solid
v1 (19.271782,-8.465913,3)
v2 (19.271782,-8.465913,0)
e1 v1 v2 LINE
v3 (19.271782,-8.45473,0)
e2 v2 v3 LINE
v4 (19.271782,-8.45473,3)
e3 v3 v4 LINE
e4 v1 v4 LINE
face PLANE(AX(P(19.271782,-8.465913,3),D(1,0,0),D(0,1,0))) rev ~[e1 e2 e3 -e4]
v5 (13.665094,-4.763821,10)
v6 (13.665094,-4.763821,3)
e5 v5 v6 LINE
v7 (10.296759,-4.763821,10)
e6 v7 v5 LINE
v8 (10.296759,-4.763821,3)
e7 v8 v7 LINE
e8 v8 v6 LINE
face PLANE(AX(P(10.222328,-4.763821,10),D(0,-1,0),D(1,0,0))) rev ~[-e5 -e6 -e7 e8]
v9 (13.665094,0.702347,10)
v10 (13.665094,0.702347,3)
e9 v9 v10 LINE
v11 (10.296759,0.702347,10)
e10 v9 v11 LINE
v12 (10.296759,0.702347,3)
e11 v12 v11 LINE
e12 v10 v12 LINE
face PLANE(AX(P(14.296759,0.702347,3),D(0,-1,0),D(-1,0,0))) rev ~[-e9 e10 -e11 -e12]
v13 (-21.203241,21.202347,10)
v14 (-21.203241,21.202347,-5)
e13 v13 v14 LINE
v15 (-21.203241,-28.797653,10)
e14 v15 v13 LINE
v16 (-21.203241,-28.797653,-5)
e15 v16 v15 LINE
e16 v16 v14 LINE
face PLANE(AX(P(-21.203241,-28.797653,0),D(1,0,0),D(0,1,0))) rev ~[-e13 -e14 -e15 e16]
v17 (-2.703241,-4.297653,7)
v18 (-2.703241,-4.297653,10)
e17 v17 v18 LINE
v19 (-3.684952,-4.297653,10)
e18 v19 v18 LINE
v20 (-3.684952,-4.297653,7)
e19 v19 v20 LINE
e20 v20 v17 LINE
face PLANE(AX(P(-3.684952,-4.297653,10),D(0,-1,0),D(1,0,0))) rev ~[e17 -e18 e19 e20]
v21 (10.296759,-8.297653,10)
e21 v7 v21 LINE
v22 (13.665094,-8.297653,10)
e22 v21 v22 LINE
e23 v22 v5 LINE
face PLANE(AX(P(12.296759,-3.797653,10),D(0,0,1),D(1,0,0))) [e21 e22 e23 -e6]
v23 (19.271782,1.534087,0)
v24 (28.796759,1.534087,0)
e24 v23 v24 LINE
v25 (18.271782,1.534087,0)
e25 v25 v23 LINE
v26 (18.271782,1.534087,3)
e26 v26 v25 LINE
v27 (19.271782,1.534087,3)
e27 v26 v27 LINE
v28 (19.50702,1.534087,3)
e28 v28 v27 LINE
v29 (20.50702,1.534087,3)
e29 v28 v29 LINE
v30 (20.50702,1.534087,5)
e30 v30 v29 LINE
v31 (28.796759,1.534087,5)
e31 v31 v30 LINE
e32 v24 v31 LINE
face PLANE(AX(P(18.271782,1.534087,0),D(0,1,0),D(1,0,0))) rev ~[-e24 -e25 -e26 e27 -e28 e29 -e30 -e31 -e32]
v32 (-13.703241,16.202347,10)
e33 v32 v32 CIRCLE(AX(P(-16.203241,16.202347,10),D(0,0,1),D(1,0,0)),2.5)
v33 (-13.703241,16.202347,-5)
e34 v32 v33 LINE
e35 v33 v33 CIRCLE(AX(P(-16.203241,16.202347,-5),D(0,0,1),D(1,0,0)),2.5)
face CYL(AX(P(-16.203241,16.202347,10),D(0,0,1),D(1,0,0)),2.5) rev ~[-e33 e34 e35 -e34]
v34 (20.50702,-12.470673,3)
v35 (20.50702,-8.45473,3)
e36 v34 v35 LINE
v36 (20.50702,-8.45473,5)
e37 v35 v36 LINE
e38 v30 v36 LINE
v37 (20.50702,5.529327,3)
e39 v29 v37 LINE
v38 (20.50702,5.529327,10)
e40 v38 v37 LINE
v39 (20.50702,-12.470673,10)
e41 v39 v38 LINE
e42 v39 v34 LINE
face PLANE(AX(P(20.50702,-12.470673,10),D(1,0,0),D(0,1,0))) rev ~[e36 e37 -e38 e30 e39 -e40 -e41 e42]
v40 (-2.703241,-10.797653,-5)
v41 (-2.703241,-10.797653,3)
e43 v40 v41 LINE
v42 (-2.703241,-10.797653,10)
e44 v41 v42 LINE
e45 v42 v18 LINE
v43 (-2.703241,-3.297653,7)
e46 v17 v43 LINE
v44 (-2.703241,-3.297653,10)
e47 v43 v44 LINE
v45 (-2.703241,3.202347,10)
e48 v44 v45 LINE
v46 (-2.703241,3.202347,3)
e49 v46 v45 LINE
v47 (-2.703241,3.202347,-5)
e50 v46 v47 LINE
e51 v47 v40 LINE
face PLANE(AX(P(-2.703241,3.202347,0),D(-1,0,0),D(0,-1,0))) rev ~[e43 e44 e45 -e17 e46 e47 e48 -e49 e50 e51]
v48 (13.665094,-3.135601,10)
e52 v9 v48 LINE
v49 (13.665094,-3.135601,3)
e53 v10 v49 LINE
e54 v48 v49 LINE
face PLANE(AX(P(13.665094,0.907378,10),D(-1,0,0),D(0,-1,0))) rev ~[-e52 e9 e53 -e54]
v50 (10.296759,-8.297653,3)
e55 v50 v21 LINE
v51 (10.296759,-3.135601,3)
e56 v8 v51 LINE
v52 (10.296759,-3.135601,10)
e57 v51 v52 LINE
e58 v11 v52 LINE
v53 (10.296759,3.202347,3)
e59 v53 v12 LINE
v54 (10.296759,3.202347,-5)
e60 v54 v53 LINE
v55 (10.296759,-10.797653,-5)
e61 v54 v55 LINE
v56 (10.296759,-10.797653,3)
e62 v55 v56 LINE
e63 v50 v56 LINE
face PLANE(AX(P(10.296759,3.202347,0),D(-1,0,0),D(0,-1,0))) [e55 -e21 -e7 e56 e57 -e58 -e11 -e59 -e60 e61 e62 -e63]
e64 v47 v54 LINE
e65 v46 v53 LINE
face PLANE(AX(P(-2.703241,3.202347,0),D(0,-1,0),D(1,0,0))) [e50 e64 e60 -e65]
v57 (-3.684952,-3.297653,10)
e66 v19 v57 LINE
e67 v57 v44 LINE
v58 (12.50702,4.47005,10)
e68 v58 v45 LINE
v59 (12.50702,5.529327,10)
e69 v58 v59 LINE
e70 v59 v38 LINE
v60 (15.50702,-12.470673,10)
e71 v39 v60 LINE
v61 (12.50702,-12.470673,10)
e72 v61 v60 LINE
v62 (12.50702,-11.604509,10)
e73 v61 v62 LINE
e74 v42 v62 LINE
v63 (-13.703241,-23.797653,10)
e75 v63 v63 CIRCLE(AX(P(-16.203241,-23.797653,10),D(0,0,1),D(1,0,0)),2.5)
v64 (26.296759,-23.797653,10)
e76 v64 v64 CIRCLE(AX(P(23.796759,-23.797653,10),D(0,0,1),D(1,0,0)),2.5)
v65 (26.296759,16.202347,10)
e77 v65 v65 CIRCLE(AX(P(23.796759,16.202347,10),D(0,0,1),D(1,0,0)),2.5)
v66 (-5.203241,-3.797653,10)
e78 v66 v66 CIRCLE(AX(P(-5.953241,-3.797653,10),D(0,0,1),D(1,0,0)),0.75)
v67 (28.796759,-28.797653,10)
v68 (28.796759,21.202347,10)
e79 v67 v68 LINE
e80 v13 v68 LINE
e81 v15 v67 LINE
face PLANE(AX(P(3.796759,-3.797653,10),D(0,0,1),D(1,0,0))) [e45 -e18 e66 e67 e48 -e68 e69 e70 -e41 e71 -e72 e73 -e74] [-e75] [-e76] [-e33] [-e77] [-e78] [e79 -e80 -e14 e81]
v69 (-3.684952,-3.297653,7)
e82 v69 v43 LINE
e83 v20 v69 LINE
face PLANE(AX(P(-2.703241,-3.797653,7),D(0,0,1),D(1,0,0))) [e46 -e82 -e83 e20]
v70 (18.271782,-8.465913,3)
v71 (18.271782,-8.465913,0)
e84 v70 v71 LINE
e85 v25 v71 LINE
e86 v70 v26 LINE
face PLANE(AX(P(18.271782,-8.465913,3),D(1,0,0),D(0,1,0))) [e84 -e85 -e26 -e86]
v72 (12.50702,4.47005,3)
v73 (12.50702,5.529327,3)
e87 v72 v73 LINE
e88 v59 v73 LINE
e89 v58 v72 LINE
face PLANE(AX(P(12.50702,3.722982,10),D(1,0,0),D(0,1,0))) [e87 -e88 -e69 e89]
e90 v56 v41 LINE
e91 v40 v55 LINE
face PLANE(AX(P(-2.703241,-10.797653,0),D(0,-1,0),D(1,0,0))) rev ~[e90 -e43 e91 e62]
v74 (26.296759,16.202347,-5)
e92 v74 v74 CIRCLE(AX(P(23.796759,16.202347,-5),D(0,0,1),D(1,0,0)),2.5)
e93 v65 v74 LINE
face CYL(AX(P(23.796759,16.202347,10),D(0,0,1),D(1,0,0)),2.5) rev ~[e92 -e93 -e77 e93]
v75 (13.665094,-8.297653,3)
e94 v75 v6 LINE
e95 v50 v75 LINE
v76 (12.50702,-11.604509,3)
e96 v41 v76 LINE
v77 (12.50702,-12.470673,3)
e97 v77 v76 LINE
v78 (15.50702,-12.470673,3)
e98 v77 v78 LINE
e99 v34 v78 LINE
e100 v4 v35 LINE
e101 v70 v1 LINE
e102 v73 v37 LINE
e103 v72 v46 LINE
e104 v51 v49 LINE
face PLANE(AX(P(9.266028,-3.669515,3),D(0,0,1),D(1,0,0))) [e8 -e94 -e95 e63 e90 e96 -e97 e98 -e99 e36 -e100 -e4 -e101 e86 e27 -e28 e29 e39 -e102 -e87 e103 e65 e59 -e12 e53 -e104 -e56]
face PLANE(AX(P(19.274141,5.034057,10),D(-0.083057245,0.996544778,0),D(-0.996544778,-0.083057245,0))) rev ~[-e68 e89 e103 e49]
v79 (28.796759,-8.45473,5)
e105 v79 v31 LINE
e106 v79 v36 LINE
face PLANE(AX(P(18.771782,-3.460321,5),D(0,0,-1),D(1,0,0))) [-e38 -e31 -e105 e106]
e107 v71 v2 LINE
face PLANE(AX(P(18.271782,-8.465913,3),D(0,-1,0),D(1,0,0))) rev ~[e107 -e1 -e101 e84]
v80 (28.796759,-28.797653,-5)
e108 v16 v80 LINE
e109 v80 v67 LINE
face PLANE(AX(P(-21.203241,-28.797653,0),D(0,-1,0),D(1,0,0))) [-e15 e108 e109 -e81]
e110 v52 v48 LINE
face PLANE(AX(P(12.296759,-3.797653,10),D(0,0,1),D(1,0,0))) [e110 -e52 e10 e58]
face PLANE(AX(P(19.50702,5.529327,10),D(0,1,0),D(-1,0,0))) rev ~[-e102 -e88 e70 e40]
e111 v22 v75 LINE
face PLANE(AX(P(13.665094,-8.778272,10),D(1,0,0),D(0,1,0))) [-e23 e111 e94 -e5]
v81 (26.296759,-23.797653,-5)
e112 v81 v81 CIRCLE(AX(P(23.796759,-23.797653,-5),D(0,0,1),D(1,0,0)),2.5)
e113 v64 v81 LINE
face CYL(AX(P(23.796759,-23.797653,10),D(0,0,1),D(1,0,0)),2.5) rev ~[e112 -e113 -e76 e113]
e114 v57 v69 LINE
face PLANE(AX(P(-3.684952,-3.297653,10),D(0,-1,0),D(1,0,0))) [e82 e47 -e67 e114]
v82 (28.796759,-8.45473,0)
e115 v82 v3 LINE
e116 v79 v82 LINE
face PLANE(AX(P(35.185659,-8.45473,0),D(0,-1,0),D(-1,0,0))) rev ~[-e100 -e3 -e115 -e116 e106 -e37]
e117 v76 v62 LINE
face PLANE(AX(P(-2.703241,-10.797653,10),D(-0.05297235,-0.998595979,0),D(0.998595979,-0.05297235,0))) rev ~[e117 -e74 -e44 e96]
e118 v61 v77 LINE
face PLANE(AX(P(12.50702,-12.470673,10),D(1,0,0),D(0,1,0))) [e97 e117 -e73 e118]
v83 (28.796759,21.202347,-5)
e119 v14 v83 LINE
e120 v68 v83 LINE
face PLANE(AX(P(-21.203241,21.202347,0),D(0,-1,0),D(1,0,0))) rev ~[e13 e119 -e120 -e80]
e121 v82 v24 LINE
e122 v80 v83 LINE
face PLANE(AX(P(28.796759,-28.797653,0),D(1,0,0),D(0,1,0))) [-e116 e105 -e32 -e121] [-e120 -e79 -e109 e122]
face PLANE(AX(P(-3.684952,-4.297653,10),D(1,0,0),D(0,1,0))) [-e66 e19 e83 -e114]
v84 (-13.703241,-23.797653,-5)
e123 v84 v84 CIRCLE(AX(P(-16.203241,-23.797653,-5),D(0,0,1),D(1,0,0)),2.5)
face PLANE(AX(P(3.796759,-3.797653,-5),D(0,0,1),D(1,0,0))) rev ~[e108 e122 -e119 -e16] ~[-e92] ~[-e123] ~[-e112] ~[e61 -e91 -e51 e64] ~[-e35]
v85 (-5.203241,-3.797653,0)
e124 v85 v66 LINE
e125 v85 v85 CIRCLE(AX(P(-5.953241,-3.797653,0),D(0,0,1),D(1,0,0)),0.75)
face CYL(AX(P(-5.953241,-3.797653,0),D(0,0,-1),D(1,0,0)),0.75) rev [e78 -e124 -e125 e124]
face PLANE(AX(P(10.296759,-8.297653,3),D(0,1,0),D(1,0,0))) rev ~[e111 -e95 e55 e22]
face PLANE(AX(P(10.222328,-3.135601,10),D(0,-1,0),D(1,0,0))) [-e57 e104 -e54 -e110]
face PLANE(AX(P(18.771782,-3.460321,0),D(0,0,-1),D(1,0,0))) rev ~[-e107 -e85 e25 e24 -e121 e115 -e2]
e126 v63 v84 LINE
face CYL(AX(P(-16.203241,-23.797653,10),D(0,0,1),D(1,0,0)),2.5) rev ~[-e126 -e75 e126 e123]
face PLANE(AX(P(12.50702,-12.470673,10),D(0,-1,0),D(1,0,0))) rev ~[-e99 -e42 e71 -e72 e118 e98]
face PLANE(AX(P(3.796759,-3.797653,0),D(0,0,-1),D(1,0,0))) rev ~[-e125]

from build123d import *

# Parameters (mm, degrees)
F0_W           = 40
F0_H           = 40
F0_R           = 0.75
F0_W_2         = 13
F0_H_2         = 14
F1_DEPTH       = 10
F3_DEPTH       = 7
F5_DEPTH       = 7
F6_W           = 1
F6_H           = 10
F7_DEPTH       = 3
F9_W           = 40
F9_H           = 40
F9_W_2         = 13
F9_H_2         = 14
F10_DEPTH      = 5
F8_W           = 16.9138771733
F8_H           = 9.9888166223
F11_DEPTH      = 5
F13_W          = 3
F13_H          = 1.8063458446
F13_H_2        = 1.6774383839
F14_DEPTH      = 7
F15_W          = 50
F15_H          = 50
F15_W_2        = 40
F15_H_2        = 40
F16_DEPTH      = 10
F16_DEPTH_BACK = 5
F8_W_2         = 1
F8_W_3         = 4.5249774149
F8_W_4         = 11.3888997585
F18_DEPTH      = 5
F17_R          = 2.5
F19_DEPTH      = 15
F20_W          = 1
F20_H          = 18
F20_W_2        = 1.1054268107
F20_H_2        = 4.0429783403
F20_H_3        = 1.6282203142
F20_W_3        = 3.4427661449
F20_H_4        = 4.0144510567
F21_DEPTH      = 7
F22_W          = 1.9634229802
F22_H          = 1
F23_DEPTH      = 3


with BuildPart() as f1:
    # F0 (on Top) → F1 (new body)
    with BuildSketch(Plane.XY):
        with Locations((3.7967593362, -3.7976530202)):
            Rectangle(F0_W, F0_H)
        with Locations((-5.9532406638, -3.7976530202)):
            Circle(F0_R, mode=Mode.SUBTRACT)
        with Locations((3.7967593362, -3.7976530202)):
            Rectangle(F0_W_2, F0_H_2, mode=Mode.SUBTRACT)
    extrude(amount=F1_DEPTH)

    # F2 (on face) → F3 (cut)
    with BuildSketch(Plane.XY.offset(10)):
        Polygon((10.2967593362, -10.7976530202), (-2.7032406638, -10.7976530202), (19.3193775079, -11.9658830875), (19.2741411646, 5.0340567263), (-2.7032406638, 3.2023469798), (10.2967593362, 3.2023469798), (10.2967593362, -1.4381406363), (10.2967593362, -5.3588831797), align=None)
    extrude(amount=-F3_DEPTH, mode=Mode.SUBTRACT)

    # F4 (on face) → F5 (join)
    with BuildSketch(Plane.XY.offset(3)):
        Polygon((10.2967593362, -3.7976530202), (10.2967593362, -8.2976530202), (14.2967593362, -8.2976530202), (14.2967593362, 0.7023469798), (10.2967593362, 0.7023469798), align=None)
    extrude(amount=F5_DEPTH)

    # F6 (on face) → F7 (cut)
    with BuildSketch(Plane.XY.offset(3)):
        with Locations((18.7717819214, -3.4659131806)):
            Rectangle(F6_W, F6_H)
    extrude(amount=-F7_DEPTH, mode=Mode.SUBTRACT)

    # F9 (on face) → F10 (join)
    with BuildSketch(Plane(origin=(0, 0, 0), x_dir=(1, 0, 0), z_dir=(0, 0, -1))):
        with Locations((3.7967593362, 3.7976530202)):
            Rectangle(F9_W, F9_H)
        with Locations((3.7967593362, 3.7976530202)):
            Rectangle(F9_W_2, F9_H_2, mode=Mode.SUBTRACT)
    extrude(amount=F10_DEPTH)

    # F8 (on face) → F11 (cut)
    with BuildSketch(Plane(origin=(0, 0, 0), x_dir=(1, 0, 0), z_dir=(0, 0, -1))):
        with Locations((26.728720508, 3.4603214917)):
            Rectangle(F8_W, F8_H)
    extrude(amount=-F11_DEPTH, mode=Mode.SUBTRACT)

    # F13 (on face) → F14 (cut)
    with BuildSketch(Plane.XY.offset(10)):
        Polygon((19.5070204958, -12.4706726056), (19.5070204958, 5.5293273944), (15.5070204958, 5.5293273944), (15.5070204958, 3.7229815498), (15.5070204958, -10.7932342216), (15.5070204958, -12.4706726056), align=None)
        with Locations((14.0070204958, 4.6261544721)):
            Rectangle(F13_W, F13_H)
        with Locations((14.0070204958, -11.6319534136)):
            Rectangle(F13_W, F13_H_2)
    extrude(amount=-F14_DEPTH, mode=Mode.SUBTRACT)

    # F15 (on Top) → F16 (join, two sides)
    with BuildSketch(Plane.XY) as f16_sk:
        with Locations((3.7967593362, -3.7976530202)):
            Rectangle(F15_W, F15_H)
        with Locations((3.7967593362, -3.7976530202)):
            Rectangle(F15_W_2, F15_H_2, mode=Mode.SUBTRACT)
    extrude(amount=F16_DEPTH)
    extrude(f16_sk.sketch, amount=-F16_DEPTH_BACK)

    # F8 (on face) → F18 (cut)
    with BuildSketch(Plane(origin=(0, 0, 0), x_dir=(1, 0, 0), z_dir=(0, 0, -1))):
        with Locations((18.7717819214, 3.4603214917)):
            Rectangle(F8_W_2, F8_H)
        with Locations((21.5342706288, 3.4603214917)):
            Rectangle(F8_W_3, F8_H)
        with Locations((29.4912092155, 3.4603214917)):
            Rectangle(F8_W_4, F8_H)
    extrude(amount=-F18_DEPTH, mode=Mode.SUBTRACT)

    # F17 (on face) → F19 (cut)
    with BuildSketch(Plane.XY.offset(10)):
        with Locations((-16.2032406638, -23.7976530202)):
            Circle(F17_R)
        with Locations((-16.2032406638, 16.2023469798)):
            Circle(F17_R)
        with Locations((23.7967593362, -23.7976530202)):
            Circle(F17_R)
        with Locations((23.7967593362, 16.2023469798)):
            Circle(F17_R)
    extrude(amount=-F19_DEPTH, mode=Mode.SUBTRACT)

    # F20 (on face) → F21 (cut)
    with BuildSketch(Plane.XY.offset(10)):
        with Locations((20.0070204958, -3.4706726056)):
            Rectangle(F20_W, F20_H)
        with Locations((14.2178074457, -1.1141116556)):
            Rectangle(F20_W_2, F20_H_2)
        with Locations((14.2178074457, -3.9497109829)):
            Rectangle(F20_W_2, F20_H_3)
        with Locations((11.9437109679, -3.9497109829)):
            Rectangle(F20_W_3, F20_H_3)
        with Locations((14.2178074457, -6.7710466683)):
            Rectangle(F20_W_2, F20_H_4)
    extrude(amount=-F21_DEPTH, mode=Mode.SUBTRACT)

    # F22 (on face) → F23 (cut)
    with BuildSketch(Plane.XY.offset(10)):
        with Locations((-2.7032406638, -3.7976530202)):
            Rectangle(F22_W, F22_H)
    extrude(amount=-F23_DEPTH, mode=Mode.SUBTRACT)


solid = f1.part
